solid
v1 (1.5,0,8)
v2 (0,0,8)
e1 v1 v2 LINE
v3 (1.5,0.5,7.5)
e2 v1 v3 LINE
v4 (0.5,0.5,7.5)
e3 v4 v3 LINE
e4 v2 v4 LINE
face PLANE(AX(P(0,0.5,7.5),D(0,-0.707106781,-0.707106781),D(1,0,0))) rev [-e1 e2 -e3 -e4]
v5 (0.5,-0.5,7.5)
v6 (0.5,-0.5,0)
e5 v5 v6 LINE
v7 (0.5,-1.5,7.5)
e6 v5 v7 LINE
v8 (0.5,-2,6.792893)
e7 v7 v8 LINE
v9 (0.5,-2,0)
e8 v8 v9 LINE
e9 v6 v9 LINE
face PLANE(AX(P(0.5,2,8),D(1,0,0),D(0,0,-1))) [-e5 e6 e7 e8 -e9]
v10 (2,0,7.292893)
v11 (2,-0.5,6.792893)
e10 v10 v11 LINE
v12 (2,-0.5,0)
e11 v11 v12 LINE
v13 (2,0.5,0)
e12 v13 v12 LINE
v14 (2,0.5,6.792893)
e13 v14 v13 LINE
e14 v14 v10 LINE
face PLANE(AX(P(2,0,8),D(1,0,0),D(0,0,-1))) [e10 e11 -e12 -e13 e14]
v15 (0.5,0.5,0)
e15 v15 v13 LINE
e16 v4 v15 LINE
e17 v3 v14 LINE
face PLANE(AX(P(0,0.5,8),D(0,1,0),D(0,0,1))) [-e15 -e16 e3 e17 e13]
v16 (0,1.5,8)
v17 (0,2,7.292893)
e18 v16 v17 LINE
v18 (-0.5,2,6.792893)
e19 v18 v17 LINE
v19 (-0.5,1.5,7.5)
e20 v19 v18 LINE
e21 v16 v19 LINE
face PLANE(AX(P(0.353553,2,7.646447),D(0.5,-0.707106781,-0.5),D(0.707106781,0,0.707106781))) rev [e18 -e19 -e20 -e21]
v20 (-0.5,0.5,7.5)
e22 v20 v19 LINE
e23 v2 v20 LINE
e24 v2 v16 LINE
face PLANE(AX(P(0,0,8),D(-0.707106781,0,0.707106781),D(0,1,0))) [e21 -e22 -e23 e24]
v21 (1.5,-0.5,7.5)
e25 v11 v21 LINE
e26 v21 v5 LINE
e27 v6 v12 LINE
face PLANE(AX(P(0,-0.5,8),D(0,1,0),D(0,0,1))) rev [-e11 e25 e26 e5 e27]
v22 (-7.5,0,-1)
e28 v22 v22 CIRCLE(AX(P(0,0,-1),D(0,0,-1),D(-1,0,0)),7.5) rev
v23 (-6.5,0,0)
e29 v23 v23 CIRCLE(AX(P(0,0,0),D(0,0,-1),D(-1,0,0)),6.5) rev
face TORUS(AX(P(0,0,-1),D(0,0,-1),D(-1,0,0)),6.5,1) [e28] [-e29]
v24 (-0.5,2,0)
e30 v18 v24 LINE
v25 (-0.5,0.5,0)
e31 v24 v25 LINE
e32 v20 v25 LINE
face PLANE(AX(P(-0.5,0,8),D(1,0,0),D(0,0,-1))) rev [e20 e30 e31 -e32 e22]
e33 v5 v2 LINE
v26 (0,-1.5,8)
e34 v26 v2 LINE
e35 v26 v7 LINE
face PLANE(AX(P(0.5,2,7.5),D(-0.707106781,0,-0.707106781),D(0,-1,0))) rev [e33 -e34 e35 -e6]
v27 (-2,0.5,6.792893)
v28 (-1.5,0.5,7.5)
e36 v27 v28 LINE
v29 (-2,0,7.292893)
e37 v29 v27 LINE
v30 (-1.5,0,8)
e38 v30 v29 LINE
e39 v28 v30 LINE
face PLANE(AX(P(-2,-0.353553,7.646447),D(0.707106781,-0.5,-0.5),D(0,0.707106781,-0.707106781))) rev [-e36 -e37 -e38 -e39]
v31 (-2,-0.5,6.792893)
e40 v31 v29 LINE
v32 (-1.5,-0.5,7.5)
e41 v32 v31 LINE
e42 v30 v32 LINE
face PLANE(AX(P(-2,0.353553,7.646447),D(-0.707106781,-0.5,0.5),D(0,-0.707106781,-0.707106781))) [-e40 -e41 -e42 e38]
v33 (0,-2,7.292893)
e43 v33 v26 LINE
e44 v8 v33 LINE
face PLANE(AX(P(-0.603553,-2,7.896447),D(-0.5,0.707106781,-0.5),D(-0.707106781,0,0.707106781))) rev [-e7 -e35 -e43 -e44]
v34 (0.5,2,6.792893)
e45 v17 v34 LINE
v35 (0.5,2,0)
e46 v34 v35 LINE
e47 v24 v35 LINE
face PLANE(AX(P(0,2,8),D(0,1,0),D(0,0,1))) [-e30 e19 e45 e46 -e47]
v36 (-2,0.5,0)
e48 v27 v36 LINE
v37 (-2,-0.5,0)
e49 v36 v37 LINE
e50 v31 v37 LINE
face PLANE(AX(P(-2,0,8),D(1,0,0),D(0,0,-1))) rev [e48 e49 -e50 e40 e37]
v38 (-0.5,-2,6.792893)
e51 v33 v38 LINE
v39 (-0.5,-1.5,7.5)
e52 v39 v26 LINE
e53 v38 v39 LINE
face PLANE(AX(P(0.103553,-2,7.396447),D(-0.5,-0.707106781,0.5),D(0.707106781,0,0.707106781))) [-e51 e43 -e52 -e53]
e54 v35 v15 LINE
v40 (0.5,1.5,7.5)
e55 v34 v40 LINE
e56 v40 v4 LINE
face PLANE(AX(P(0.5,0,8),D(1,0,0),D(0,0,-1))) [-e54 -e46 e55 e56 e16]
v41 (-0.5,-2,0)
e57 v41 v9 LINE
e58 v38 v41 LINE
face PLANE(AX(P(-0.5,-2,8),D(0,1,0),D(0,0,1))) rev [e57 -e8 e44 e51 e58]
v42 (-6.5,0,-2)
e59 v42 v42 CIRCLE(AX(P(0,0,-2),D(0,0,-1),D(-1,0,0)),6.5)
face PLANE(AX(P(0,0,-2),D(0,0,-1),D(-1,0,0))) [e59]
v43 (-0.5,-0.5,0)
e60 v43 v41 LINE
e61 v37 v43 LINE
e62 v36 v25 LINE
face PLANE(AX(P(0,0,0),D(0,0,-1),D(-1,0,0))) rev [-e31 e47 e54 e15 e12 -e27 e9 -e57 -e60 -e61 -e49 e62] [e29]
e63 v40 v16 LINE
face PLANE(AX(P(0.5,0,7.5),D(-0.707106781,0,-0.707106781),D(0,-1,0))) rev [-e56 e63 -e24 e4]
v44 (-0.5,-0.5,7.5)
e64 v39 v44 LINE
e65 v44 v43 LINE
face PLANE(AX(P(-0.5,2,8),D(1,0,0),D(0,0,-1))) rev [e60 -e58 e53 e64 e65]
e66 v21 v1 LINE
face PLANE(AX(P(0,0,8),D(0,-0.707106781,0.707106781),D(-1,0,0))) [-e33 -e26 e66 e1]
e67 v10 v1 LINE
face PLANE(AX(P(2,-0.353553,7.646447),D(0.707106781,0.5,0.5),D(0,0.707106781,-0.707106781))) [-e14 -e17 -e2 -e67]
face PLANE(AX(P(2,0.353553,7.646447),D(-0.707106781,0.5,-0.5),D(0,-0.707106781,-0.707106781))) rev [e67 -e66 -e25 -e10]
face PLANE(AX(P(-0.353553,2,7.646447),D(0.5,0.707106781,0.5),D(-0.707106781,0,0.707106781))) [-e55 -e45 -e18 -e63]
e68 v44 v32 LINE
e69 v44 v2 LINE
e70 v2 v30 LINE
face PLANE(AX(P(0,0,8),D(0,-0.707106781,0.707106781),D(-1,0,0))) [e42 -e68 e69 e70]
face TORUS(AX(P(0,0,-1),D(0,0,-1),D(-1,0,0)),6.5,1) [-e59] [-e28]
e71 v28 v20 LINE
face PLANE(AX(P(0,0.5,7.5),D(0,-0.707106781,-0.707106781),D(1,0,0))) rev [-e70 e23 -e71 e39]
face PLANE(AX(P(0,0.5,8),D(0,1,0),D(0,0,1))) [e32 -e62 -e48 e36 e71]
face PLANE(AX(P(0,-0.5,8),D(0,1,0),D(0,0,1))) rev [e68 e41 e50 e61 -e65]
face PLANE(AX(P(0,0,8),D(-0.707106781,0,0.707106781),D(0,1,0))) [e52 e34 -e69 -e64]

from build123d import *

# Parameters (mm, degrees)
SKETCH_1_W      = 4
SKETCH_1_H      = 1
SKETCH_1_W_2    = 1
SKETCH_1_H_2    = 4
EXTRUDE_1_DEPTH = 8
CHAMFER_1_SIZE  = 0.5
CHAMFER_2_SIZE  = 0.5
SKETCH_2_R      = 7.5
EXTRUDE_2_DEPTH = 2
FILLET_1_R      = 1


# Some blends are built 0.0001 mm under size
with BuildPart() as part:
    # 草图1 → 凸台-拉伸1 (new body)
    with BuildSketch(Plane.XY):
        Rectangle(SKETCH_1_W, SKETCH_1_H)
        Rectangle(SKETCH_1_W_2, SKETCH_1_H_2)
    extrude(amount=EXTRUDE_1_DEPTH)

    # 倒角1
    chamfer_1_edges = [part.edges().sort_by_distance(p)[0] for p in [
        (-1.25, -0.5, 8),
        (-0.5, -1.25, 8),
        (0.5, -1.25, 8),
        (1.25, -0.5, 8),
        (-1.25, 0.5, 8),
        (-0.5, 1.25, 8),
        (1.25, 0.5, 8),
        (0.5, 1.25, 8),
    ]]
    chamfer(chamfer_1_edges, length=CHAMFER_1_SIZE - 0.0001)  # a hair under: the kernel refuses the full size

    # 倒角2
    # the kernel refuses this chamfer: 0.5 mm, written as the material it takes off along each edge
    with BuildSketch(Plane(origin=(-2, 1.40922724, 6.59087276), x_dir=(0.9996219169112968, 0.01944252080601401, 0.019442520806014003), z_dir=(0, -0.7071067811865474, 0.7071067811865477)), Plane(origin=(0.90912724, -2, 8.90922724), x_dir=(0.7068394360706737, -0.02749587661058652, -0.7068394360706732), z_dir=(-0.7071067811865474, 0, -0.7071067811865477)), Plane(origin=(2, 0.90912724, 8.90922724), x_dir=(0.027495876610586514, 0.7068394360706736, -0.7068394360706733), z_dir=(0, -0.7071067811865474, -0.7071067811865477)), Plane(origin=(-0.90912724, 2, 8.90922724), x_dir=(-0.7068394360706737, 0.02749587661058652, -0.7068394360706732), z_dir=(0.7071067811865474, 0, -0.7071067811865477)), Plane(origin=(-1.40922724, 2, 6.59087276), x_dir=(0.7068394360706737, 0.027495876610586494, -0.7068394360706733), z_dir=(0.7071067811865474, 0, 0.7071067811865477))) as chamfer_2_piece_1:
        Polygon((CHAMFER_2_SIZE * 0.999621916911, -CHAMFER_2_SIZE * 0.0274958766106), (-CHAMFER_2_SIZE * 0.0274958766106, -CHAMFER_2_SIZE * 0.999621916911), (0, 0), align=None)
    extrude(amount=3.278648348, mode=Mode.SUBTRACT)
    with BuildSketch(Plane(origin=(-2, 0.90912724, 8.90922724), x_dir=(-0.027495876610586514, 0.7068394360706736, -0.7068394360706733), z_dir=(0, -0.7071067811865474, -0.7071067811865477)), Plane(origin=(-0.90912724, -2, 8.90922724), x_dir=(-0.7068394360706737, -0.02749587661058652, -0.7068394360706732), z_dir=(0.7071067811865474, 0, -0.7071067811865477)), Plane(origin=(2, -0.90912724, 8.90922724), x_dir=(0.027495876610586514, -0.7068394360706736, -0.7068394360706733), z_dir=(0, 0.7071067811865474, -0.7071067811865477))) as chamfer_2_piece_2:
        Polygon((CHAMFER_2_SIZE * 0.999621916911, CHAMFER_2_SIZE * 0.0274958766106), (-CHAMFER_2_SIZE * 0.0274958766106, CHAMFER_2_SIZE * 0.999621916911), (0, 0), align=None)
    extrude(amount=3.278648348, mode=Mode.SUBTRACT)

    # 草图2 → 凸台-拉伸2 (add)
    with BuildSketch(Plane(origin=(0, 0, 0), x_dir=(-1, 0, 0), z_dir=(0, 0, -1))):
        Circle(SKETCH_2_R)
    extrude(amount=EXTRUDE_2_DEPTH)

    # 圆角1
    fillet_1_edges = [part.edges().sort_by_distance(p)[0] for p in [
        (7.5, 0, 0),
        (7.5, 0, -2),
    ]]
    fillet(fillet_1_edges, radius=FILLET_1_R - 0.0001)  # a hair under: the kernel refuses the full size


solid = part.part
